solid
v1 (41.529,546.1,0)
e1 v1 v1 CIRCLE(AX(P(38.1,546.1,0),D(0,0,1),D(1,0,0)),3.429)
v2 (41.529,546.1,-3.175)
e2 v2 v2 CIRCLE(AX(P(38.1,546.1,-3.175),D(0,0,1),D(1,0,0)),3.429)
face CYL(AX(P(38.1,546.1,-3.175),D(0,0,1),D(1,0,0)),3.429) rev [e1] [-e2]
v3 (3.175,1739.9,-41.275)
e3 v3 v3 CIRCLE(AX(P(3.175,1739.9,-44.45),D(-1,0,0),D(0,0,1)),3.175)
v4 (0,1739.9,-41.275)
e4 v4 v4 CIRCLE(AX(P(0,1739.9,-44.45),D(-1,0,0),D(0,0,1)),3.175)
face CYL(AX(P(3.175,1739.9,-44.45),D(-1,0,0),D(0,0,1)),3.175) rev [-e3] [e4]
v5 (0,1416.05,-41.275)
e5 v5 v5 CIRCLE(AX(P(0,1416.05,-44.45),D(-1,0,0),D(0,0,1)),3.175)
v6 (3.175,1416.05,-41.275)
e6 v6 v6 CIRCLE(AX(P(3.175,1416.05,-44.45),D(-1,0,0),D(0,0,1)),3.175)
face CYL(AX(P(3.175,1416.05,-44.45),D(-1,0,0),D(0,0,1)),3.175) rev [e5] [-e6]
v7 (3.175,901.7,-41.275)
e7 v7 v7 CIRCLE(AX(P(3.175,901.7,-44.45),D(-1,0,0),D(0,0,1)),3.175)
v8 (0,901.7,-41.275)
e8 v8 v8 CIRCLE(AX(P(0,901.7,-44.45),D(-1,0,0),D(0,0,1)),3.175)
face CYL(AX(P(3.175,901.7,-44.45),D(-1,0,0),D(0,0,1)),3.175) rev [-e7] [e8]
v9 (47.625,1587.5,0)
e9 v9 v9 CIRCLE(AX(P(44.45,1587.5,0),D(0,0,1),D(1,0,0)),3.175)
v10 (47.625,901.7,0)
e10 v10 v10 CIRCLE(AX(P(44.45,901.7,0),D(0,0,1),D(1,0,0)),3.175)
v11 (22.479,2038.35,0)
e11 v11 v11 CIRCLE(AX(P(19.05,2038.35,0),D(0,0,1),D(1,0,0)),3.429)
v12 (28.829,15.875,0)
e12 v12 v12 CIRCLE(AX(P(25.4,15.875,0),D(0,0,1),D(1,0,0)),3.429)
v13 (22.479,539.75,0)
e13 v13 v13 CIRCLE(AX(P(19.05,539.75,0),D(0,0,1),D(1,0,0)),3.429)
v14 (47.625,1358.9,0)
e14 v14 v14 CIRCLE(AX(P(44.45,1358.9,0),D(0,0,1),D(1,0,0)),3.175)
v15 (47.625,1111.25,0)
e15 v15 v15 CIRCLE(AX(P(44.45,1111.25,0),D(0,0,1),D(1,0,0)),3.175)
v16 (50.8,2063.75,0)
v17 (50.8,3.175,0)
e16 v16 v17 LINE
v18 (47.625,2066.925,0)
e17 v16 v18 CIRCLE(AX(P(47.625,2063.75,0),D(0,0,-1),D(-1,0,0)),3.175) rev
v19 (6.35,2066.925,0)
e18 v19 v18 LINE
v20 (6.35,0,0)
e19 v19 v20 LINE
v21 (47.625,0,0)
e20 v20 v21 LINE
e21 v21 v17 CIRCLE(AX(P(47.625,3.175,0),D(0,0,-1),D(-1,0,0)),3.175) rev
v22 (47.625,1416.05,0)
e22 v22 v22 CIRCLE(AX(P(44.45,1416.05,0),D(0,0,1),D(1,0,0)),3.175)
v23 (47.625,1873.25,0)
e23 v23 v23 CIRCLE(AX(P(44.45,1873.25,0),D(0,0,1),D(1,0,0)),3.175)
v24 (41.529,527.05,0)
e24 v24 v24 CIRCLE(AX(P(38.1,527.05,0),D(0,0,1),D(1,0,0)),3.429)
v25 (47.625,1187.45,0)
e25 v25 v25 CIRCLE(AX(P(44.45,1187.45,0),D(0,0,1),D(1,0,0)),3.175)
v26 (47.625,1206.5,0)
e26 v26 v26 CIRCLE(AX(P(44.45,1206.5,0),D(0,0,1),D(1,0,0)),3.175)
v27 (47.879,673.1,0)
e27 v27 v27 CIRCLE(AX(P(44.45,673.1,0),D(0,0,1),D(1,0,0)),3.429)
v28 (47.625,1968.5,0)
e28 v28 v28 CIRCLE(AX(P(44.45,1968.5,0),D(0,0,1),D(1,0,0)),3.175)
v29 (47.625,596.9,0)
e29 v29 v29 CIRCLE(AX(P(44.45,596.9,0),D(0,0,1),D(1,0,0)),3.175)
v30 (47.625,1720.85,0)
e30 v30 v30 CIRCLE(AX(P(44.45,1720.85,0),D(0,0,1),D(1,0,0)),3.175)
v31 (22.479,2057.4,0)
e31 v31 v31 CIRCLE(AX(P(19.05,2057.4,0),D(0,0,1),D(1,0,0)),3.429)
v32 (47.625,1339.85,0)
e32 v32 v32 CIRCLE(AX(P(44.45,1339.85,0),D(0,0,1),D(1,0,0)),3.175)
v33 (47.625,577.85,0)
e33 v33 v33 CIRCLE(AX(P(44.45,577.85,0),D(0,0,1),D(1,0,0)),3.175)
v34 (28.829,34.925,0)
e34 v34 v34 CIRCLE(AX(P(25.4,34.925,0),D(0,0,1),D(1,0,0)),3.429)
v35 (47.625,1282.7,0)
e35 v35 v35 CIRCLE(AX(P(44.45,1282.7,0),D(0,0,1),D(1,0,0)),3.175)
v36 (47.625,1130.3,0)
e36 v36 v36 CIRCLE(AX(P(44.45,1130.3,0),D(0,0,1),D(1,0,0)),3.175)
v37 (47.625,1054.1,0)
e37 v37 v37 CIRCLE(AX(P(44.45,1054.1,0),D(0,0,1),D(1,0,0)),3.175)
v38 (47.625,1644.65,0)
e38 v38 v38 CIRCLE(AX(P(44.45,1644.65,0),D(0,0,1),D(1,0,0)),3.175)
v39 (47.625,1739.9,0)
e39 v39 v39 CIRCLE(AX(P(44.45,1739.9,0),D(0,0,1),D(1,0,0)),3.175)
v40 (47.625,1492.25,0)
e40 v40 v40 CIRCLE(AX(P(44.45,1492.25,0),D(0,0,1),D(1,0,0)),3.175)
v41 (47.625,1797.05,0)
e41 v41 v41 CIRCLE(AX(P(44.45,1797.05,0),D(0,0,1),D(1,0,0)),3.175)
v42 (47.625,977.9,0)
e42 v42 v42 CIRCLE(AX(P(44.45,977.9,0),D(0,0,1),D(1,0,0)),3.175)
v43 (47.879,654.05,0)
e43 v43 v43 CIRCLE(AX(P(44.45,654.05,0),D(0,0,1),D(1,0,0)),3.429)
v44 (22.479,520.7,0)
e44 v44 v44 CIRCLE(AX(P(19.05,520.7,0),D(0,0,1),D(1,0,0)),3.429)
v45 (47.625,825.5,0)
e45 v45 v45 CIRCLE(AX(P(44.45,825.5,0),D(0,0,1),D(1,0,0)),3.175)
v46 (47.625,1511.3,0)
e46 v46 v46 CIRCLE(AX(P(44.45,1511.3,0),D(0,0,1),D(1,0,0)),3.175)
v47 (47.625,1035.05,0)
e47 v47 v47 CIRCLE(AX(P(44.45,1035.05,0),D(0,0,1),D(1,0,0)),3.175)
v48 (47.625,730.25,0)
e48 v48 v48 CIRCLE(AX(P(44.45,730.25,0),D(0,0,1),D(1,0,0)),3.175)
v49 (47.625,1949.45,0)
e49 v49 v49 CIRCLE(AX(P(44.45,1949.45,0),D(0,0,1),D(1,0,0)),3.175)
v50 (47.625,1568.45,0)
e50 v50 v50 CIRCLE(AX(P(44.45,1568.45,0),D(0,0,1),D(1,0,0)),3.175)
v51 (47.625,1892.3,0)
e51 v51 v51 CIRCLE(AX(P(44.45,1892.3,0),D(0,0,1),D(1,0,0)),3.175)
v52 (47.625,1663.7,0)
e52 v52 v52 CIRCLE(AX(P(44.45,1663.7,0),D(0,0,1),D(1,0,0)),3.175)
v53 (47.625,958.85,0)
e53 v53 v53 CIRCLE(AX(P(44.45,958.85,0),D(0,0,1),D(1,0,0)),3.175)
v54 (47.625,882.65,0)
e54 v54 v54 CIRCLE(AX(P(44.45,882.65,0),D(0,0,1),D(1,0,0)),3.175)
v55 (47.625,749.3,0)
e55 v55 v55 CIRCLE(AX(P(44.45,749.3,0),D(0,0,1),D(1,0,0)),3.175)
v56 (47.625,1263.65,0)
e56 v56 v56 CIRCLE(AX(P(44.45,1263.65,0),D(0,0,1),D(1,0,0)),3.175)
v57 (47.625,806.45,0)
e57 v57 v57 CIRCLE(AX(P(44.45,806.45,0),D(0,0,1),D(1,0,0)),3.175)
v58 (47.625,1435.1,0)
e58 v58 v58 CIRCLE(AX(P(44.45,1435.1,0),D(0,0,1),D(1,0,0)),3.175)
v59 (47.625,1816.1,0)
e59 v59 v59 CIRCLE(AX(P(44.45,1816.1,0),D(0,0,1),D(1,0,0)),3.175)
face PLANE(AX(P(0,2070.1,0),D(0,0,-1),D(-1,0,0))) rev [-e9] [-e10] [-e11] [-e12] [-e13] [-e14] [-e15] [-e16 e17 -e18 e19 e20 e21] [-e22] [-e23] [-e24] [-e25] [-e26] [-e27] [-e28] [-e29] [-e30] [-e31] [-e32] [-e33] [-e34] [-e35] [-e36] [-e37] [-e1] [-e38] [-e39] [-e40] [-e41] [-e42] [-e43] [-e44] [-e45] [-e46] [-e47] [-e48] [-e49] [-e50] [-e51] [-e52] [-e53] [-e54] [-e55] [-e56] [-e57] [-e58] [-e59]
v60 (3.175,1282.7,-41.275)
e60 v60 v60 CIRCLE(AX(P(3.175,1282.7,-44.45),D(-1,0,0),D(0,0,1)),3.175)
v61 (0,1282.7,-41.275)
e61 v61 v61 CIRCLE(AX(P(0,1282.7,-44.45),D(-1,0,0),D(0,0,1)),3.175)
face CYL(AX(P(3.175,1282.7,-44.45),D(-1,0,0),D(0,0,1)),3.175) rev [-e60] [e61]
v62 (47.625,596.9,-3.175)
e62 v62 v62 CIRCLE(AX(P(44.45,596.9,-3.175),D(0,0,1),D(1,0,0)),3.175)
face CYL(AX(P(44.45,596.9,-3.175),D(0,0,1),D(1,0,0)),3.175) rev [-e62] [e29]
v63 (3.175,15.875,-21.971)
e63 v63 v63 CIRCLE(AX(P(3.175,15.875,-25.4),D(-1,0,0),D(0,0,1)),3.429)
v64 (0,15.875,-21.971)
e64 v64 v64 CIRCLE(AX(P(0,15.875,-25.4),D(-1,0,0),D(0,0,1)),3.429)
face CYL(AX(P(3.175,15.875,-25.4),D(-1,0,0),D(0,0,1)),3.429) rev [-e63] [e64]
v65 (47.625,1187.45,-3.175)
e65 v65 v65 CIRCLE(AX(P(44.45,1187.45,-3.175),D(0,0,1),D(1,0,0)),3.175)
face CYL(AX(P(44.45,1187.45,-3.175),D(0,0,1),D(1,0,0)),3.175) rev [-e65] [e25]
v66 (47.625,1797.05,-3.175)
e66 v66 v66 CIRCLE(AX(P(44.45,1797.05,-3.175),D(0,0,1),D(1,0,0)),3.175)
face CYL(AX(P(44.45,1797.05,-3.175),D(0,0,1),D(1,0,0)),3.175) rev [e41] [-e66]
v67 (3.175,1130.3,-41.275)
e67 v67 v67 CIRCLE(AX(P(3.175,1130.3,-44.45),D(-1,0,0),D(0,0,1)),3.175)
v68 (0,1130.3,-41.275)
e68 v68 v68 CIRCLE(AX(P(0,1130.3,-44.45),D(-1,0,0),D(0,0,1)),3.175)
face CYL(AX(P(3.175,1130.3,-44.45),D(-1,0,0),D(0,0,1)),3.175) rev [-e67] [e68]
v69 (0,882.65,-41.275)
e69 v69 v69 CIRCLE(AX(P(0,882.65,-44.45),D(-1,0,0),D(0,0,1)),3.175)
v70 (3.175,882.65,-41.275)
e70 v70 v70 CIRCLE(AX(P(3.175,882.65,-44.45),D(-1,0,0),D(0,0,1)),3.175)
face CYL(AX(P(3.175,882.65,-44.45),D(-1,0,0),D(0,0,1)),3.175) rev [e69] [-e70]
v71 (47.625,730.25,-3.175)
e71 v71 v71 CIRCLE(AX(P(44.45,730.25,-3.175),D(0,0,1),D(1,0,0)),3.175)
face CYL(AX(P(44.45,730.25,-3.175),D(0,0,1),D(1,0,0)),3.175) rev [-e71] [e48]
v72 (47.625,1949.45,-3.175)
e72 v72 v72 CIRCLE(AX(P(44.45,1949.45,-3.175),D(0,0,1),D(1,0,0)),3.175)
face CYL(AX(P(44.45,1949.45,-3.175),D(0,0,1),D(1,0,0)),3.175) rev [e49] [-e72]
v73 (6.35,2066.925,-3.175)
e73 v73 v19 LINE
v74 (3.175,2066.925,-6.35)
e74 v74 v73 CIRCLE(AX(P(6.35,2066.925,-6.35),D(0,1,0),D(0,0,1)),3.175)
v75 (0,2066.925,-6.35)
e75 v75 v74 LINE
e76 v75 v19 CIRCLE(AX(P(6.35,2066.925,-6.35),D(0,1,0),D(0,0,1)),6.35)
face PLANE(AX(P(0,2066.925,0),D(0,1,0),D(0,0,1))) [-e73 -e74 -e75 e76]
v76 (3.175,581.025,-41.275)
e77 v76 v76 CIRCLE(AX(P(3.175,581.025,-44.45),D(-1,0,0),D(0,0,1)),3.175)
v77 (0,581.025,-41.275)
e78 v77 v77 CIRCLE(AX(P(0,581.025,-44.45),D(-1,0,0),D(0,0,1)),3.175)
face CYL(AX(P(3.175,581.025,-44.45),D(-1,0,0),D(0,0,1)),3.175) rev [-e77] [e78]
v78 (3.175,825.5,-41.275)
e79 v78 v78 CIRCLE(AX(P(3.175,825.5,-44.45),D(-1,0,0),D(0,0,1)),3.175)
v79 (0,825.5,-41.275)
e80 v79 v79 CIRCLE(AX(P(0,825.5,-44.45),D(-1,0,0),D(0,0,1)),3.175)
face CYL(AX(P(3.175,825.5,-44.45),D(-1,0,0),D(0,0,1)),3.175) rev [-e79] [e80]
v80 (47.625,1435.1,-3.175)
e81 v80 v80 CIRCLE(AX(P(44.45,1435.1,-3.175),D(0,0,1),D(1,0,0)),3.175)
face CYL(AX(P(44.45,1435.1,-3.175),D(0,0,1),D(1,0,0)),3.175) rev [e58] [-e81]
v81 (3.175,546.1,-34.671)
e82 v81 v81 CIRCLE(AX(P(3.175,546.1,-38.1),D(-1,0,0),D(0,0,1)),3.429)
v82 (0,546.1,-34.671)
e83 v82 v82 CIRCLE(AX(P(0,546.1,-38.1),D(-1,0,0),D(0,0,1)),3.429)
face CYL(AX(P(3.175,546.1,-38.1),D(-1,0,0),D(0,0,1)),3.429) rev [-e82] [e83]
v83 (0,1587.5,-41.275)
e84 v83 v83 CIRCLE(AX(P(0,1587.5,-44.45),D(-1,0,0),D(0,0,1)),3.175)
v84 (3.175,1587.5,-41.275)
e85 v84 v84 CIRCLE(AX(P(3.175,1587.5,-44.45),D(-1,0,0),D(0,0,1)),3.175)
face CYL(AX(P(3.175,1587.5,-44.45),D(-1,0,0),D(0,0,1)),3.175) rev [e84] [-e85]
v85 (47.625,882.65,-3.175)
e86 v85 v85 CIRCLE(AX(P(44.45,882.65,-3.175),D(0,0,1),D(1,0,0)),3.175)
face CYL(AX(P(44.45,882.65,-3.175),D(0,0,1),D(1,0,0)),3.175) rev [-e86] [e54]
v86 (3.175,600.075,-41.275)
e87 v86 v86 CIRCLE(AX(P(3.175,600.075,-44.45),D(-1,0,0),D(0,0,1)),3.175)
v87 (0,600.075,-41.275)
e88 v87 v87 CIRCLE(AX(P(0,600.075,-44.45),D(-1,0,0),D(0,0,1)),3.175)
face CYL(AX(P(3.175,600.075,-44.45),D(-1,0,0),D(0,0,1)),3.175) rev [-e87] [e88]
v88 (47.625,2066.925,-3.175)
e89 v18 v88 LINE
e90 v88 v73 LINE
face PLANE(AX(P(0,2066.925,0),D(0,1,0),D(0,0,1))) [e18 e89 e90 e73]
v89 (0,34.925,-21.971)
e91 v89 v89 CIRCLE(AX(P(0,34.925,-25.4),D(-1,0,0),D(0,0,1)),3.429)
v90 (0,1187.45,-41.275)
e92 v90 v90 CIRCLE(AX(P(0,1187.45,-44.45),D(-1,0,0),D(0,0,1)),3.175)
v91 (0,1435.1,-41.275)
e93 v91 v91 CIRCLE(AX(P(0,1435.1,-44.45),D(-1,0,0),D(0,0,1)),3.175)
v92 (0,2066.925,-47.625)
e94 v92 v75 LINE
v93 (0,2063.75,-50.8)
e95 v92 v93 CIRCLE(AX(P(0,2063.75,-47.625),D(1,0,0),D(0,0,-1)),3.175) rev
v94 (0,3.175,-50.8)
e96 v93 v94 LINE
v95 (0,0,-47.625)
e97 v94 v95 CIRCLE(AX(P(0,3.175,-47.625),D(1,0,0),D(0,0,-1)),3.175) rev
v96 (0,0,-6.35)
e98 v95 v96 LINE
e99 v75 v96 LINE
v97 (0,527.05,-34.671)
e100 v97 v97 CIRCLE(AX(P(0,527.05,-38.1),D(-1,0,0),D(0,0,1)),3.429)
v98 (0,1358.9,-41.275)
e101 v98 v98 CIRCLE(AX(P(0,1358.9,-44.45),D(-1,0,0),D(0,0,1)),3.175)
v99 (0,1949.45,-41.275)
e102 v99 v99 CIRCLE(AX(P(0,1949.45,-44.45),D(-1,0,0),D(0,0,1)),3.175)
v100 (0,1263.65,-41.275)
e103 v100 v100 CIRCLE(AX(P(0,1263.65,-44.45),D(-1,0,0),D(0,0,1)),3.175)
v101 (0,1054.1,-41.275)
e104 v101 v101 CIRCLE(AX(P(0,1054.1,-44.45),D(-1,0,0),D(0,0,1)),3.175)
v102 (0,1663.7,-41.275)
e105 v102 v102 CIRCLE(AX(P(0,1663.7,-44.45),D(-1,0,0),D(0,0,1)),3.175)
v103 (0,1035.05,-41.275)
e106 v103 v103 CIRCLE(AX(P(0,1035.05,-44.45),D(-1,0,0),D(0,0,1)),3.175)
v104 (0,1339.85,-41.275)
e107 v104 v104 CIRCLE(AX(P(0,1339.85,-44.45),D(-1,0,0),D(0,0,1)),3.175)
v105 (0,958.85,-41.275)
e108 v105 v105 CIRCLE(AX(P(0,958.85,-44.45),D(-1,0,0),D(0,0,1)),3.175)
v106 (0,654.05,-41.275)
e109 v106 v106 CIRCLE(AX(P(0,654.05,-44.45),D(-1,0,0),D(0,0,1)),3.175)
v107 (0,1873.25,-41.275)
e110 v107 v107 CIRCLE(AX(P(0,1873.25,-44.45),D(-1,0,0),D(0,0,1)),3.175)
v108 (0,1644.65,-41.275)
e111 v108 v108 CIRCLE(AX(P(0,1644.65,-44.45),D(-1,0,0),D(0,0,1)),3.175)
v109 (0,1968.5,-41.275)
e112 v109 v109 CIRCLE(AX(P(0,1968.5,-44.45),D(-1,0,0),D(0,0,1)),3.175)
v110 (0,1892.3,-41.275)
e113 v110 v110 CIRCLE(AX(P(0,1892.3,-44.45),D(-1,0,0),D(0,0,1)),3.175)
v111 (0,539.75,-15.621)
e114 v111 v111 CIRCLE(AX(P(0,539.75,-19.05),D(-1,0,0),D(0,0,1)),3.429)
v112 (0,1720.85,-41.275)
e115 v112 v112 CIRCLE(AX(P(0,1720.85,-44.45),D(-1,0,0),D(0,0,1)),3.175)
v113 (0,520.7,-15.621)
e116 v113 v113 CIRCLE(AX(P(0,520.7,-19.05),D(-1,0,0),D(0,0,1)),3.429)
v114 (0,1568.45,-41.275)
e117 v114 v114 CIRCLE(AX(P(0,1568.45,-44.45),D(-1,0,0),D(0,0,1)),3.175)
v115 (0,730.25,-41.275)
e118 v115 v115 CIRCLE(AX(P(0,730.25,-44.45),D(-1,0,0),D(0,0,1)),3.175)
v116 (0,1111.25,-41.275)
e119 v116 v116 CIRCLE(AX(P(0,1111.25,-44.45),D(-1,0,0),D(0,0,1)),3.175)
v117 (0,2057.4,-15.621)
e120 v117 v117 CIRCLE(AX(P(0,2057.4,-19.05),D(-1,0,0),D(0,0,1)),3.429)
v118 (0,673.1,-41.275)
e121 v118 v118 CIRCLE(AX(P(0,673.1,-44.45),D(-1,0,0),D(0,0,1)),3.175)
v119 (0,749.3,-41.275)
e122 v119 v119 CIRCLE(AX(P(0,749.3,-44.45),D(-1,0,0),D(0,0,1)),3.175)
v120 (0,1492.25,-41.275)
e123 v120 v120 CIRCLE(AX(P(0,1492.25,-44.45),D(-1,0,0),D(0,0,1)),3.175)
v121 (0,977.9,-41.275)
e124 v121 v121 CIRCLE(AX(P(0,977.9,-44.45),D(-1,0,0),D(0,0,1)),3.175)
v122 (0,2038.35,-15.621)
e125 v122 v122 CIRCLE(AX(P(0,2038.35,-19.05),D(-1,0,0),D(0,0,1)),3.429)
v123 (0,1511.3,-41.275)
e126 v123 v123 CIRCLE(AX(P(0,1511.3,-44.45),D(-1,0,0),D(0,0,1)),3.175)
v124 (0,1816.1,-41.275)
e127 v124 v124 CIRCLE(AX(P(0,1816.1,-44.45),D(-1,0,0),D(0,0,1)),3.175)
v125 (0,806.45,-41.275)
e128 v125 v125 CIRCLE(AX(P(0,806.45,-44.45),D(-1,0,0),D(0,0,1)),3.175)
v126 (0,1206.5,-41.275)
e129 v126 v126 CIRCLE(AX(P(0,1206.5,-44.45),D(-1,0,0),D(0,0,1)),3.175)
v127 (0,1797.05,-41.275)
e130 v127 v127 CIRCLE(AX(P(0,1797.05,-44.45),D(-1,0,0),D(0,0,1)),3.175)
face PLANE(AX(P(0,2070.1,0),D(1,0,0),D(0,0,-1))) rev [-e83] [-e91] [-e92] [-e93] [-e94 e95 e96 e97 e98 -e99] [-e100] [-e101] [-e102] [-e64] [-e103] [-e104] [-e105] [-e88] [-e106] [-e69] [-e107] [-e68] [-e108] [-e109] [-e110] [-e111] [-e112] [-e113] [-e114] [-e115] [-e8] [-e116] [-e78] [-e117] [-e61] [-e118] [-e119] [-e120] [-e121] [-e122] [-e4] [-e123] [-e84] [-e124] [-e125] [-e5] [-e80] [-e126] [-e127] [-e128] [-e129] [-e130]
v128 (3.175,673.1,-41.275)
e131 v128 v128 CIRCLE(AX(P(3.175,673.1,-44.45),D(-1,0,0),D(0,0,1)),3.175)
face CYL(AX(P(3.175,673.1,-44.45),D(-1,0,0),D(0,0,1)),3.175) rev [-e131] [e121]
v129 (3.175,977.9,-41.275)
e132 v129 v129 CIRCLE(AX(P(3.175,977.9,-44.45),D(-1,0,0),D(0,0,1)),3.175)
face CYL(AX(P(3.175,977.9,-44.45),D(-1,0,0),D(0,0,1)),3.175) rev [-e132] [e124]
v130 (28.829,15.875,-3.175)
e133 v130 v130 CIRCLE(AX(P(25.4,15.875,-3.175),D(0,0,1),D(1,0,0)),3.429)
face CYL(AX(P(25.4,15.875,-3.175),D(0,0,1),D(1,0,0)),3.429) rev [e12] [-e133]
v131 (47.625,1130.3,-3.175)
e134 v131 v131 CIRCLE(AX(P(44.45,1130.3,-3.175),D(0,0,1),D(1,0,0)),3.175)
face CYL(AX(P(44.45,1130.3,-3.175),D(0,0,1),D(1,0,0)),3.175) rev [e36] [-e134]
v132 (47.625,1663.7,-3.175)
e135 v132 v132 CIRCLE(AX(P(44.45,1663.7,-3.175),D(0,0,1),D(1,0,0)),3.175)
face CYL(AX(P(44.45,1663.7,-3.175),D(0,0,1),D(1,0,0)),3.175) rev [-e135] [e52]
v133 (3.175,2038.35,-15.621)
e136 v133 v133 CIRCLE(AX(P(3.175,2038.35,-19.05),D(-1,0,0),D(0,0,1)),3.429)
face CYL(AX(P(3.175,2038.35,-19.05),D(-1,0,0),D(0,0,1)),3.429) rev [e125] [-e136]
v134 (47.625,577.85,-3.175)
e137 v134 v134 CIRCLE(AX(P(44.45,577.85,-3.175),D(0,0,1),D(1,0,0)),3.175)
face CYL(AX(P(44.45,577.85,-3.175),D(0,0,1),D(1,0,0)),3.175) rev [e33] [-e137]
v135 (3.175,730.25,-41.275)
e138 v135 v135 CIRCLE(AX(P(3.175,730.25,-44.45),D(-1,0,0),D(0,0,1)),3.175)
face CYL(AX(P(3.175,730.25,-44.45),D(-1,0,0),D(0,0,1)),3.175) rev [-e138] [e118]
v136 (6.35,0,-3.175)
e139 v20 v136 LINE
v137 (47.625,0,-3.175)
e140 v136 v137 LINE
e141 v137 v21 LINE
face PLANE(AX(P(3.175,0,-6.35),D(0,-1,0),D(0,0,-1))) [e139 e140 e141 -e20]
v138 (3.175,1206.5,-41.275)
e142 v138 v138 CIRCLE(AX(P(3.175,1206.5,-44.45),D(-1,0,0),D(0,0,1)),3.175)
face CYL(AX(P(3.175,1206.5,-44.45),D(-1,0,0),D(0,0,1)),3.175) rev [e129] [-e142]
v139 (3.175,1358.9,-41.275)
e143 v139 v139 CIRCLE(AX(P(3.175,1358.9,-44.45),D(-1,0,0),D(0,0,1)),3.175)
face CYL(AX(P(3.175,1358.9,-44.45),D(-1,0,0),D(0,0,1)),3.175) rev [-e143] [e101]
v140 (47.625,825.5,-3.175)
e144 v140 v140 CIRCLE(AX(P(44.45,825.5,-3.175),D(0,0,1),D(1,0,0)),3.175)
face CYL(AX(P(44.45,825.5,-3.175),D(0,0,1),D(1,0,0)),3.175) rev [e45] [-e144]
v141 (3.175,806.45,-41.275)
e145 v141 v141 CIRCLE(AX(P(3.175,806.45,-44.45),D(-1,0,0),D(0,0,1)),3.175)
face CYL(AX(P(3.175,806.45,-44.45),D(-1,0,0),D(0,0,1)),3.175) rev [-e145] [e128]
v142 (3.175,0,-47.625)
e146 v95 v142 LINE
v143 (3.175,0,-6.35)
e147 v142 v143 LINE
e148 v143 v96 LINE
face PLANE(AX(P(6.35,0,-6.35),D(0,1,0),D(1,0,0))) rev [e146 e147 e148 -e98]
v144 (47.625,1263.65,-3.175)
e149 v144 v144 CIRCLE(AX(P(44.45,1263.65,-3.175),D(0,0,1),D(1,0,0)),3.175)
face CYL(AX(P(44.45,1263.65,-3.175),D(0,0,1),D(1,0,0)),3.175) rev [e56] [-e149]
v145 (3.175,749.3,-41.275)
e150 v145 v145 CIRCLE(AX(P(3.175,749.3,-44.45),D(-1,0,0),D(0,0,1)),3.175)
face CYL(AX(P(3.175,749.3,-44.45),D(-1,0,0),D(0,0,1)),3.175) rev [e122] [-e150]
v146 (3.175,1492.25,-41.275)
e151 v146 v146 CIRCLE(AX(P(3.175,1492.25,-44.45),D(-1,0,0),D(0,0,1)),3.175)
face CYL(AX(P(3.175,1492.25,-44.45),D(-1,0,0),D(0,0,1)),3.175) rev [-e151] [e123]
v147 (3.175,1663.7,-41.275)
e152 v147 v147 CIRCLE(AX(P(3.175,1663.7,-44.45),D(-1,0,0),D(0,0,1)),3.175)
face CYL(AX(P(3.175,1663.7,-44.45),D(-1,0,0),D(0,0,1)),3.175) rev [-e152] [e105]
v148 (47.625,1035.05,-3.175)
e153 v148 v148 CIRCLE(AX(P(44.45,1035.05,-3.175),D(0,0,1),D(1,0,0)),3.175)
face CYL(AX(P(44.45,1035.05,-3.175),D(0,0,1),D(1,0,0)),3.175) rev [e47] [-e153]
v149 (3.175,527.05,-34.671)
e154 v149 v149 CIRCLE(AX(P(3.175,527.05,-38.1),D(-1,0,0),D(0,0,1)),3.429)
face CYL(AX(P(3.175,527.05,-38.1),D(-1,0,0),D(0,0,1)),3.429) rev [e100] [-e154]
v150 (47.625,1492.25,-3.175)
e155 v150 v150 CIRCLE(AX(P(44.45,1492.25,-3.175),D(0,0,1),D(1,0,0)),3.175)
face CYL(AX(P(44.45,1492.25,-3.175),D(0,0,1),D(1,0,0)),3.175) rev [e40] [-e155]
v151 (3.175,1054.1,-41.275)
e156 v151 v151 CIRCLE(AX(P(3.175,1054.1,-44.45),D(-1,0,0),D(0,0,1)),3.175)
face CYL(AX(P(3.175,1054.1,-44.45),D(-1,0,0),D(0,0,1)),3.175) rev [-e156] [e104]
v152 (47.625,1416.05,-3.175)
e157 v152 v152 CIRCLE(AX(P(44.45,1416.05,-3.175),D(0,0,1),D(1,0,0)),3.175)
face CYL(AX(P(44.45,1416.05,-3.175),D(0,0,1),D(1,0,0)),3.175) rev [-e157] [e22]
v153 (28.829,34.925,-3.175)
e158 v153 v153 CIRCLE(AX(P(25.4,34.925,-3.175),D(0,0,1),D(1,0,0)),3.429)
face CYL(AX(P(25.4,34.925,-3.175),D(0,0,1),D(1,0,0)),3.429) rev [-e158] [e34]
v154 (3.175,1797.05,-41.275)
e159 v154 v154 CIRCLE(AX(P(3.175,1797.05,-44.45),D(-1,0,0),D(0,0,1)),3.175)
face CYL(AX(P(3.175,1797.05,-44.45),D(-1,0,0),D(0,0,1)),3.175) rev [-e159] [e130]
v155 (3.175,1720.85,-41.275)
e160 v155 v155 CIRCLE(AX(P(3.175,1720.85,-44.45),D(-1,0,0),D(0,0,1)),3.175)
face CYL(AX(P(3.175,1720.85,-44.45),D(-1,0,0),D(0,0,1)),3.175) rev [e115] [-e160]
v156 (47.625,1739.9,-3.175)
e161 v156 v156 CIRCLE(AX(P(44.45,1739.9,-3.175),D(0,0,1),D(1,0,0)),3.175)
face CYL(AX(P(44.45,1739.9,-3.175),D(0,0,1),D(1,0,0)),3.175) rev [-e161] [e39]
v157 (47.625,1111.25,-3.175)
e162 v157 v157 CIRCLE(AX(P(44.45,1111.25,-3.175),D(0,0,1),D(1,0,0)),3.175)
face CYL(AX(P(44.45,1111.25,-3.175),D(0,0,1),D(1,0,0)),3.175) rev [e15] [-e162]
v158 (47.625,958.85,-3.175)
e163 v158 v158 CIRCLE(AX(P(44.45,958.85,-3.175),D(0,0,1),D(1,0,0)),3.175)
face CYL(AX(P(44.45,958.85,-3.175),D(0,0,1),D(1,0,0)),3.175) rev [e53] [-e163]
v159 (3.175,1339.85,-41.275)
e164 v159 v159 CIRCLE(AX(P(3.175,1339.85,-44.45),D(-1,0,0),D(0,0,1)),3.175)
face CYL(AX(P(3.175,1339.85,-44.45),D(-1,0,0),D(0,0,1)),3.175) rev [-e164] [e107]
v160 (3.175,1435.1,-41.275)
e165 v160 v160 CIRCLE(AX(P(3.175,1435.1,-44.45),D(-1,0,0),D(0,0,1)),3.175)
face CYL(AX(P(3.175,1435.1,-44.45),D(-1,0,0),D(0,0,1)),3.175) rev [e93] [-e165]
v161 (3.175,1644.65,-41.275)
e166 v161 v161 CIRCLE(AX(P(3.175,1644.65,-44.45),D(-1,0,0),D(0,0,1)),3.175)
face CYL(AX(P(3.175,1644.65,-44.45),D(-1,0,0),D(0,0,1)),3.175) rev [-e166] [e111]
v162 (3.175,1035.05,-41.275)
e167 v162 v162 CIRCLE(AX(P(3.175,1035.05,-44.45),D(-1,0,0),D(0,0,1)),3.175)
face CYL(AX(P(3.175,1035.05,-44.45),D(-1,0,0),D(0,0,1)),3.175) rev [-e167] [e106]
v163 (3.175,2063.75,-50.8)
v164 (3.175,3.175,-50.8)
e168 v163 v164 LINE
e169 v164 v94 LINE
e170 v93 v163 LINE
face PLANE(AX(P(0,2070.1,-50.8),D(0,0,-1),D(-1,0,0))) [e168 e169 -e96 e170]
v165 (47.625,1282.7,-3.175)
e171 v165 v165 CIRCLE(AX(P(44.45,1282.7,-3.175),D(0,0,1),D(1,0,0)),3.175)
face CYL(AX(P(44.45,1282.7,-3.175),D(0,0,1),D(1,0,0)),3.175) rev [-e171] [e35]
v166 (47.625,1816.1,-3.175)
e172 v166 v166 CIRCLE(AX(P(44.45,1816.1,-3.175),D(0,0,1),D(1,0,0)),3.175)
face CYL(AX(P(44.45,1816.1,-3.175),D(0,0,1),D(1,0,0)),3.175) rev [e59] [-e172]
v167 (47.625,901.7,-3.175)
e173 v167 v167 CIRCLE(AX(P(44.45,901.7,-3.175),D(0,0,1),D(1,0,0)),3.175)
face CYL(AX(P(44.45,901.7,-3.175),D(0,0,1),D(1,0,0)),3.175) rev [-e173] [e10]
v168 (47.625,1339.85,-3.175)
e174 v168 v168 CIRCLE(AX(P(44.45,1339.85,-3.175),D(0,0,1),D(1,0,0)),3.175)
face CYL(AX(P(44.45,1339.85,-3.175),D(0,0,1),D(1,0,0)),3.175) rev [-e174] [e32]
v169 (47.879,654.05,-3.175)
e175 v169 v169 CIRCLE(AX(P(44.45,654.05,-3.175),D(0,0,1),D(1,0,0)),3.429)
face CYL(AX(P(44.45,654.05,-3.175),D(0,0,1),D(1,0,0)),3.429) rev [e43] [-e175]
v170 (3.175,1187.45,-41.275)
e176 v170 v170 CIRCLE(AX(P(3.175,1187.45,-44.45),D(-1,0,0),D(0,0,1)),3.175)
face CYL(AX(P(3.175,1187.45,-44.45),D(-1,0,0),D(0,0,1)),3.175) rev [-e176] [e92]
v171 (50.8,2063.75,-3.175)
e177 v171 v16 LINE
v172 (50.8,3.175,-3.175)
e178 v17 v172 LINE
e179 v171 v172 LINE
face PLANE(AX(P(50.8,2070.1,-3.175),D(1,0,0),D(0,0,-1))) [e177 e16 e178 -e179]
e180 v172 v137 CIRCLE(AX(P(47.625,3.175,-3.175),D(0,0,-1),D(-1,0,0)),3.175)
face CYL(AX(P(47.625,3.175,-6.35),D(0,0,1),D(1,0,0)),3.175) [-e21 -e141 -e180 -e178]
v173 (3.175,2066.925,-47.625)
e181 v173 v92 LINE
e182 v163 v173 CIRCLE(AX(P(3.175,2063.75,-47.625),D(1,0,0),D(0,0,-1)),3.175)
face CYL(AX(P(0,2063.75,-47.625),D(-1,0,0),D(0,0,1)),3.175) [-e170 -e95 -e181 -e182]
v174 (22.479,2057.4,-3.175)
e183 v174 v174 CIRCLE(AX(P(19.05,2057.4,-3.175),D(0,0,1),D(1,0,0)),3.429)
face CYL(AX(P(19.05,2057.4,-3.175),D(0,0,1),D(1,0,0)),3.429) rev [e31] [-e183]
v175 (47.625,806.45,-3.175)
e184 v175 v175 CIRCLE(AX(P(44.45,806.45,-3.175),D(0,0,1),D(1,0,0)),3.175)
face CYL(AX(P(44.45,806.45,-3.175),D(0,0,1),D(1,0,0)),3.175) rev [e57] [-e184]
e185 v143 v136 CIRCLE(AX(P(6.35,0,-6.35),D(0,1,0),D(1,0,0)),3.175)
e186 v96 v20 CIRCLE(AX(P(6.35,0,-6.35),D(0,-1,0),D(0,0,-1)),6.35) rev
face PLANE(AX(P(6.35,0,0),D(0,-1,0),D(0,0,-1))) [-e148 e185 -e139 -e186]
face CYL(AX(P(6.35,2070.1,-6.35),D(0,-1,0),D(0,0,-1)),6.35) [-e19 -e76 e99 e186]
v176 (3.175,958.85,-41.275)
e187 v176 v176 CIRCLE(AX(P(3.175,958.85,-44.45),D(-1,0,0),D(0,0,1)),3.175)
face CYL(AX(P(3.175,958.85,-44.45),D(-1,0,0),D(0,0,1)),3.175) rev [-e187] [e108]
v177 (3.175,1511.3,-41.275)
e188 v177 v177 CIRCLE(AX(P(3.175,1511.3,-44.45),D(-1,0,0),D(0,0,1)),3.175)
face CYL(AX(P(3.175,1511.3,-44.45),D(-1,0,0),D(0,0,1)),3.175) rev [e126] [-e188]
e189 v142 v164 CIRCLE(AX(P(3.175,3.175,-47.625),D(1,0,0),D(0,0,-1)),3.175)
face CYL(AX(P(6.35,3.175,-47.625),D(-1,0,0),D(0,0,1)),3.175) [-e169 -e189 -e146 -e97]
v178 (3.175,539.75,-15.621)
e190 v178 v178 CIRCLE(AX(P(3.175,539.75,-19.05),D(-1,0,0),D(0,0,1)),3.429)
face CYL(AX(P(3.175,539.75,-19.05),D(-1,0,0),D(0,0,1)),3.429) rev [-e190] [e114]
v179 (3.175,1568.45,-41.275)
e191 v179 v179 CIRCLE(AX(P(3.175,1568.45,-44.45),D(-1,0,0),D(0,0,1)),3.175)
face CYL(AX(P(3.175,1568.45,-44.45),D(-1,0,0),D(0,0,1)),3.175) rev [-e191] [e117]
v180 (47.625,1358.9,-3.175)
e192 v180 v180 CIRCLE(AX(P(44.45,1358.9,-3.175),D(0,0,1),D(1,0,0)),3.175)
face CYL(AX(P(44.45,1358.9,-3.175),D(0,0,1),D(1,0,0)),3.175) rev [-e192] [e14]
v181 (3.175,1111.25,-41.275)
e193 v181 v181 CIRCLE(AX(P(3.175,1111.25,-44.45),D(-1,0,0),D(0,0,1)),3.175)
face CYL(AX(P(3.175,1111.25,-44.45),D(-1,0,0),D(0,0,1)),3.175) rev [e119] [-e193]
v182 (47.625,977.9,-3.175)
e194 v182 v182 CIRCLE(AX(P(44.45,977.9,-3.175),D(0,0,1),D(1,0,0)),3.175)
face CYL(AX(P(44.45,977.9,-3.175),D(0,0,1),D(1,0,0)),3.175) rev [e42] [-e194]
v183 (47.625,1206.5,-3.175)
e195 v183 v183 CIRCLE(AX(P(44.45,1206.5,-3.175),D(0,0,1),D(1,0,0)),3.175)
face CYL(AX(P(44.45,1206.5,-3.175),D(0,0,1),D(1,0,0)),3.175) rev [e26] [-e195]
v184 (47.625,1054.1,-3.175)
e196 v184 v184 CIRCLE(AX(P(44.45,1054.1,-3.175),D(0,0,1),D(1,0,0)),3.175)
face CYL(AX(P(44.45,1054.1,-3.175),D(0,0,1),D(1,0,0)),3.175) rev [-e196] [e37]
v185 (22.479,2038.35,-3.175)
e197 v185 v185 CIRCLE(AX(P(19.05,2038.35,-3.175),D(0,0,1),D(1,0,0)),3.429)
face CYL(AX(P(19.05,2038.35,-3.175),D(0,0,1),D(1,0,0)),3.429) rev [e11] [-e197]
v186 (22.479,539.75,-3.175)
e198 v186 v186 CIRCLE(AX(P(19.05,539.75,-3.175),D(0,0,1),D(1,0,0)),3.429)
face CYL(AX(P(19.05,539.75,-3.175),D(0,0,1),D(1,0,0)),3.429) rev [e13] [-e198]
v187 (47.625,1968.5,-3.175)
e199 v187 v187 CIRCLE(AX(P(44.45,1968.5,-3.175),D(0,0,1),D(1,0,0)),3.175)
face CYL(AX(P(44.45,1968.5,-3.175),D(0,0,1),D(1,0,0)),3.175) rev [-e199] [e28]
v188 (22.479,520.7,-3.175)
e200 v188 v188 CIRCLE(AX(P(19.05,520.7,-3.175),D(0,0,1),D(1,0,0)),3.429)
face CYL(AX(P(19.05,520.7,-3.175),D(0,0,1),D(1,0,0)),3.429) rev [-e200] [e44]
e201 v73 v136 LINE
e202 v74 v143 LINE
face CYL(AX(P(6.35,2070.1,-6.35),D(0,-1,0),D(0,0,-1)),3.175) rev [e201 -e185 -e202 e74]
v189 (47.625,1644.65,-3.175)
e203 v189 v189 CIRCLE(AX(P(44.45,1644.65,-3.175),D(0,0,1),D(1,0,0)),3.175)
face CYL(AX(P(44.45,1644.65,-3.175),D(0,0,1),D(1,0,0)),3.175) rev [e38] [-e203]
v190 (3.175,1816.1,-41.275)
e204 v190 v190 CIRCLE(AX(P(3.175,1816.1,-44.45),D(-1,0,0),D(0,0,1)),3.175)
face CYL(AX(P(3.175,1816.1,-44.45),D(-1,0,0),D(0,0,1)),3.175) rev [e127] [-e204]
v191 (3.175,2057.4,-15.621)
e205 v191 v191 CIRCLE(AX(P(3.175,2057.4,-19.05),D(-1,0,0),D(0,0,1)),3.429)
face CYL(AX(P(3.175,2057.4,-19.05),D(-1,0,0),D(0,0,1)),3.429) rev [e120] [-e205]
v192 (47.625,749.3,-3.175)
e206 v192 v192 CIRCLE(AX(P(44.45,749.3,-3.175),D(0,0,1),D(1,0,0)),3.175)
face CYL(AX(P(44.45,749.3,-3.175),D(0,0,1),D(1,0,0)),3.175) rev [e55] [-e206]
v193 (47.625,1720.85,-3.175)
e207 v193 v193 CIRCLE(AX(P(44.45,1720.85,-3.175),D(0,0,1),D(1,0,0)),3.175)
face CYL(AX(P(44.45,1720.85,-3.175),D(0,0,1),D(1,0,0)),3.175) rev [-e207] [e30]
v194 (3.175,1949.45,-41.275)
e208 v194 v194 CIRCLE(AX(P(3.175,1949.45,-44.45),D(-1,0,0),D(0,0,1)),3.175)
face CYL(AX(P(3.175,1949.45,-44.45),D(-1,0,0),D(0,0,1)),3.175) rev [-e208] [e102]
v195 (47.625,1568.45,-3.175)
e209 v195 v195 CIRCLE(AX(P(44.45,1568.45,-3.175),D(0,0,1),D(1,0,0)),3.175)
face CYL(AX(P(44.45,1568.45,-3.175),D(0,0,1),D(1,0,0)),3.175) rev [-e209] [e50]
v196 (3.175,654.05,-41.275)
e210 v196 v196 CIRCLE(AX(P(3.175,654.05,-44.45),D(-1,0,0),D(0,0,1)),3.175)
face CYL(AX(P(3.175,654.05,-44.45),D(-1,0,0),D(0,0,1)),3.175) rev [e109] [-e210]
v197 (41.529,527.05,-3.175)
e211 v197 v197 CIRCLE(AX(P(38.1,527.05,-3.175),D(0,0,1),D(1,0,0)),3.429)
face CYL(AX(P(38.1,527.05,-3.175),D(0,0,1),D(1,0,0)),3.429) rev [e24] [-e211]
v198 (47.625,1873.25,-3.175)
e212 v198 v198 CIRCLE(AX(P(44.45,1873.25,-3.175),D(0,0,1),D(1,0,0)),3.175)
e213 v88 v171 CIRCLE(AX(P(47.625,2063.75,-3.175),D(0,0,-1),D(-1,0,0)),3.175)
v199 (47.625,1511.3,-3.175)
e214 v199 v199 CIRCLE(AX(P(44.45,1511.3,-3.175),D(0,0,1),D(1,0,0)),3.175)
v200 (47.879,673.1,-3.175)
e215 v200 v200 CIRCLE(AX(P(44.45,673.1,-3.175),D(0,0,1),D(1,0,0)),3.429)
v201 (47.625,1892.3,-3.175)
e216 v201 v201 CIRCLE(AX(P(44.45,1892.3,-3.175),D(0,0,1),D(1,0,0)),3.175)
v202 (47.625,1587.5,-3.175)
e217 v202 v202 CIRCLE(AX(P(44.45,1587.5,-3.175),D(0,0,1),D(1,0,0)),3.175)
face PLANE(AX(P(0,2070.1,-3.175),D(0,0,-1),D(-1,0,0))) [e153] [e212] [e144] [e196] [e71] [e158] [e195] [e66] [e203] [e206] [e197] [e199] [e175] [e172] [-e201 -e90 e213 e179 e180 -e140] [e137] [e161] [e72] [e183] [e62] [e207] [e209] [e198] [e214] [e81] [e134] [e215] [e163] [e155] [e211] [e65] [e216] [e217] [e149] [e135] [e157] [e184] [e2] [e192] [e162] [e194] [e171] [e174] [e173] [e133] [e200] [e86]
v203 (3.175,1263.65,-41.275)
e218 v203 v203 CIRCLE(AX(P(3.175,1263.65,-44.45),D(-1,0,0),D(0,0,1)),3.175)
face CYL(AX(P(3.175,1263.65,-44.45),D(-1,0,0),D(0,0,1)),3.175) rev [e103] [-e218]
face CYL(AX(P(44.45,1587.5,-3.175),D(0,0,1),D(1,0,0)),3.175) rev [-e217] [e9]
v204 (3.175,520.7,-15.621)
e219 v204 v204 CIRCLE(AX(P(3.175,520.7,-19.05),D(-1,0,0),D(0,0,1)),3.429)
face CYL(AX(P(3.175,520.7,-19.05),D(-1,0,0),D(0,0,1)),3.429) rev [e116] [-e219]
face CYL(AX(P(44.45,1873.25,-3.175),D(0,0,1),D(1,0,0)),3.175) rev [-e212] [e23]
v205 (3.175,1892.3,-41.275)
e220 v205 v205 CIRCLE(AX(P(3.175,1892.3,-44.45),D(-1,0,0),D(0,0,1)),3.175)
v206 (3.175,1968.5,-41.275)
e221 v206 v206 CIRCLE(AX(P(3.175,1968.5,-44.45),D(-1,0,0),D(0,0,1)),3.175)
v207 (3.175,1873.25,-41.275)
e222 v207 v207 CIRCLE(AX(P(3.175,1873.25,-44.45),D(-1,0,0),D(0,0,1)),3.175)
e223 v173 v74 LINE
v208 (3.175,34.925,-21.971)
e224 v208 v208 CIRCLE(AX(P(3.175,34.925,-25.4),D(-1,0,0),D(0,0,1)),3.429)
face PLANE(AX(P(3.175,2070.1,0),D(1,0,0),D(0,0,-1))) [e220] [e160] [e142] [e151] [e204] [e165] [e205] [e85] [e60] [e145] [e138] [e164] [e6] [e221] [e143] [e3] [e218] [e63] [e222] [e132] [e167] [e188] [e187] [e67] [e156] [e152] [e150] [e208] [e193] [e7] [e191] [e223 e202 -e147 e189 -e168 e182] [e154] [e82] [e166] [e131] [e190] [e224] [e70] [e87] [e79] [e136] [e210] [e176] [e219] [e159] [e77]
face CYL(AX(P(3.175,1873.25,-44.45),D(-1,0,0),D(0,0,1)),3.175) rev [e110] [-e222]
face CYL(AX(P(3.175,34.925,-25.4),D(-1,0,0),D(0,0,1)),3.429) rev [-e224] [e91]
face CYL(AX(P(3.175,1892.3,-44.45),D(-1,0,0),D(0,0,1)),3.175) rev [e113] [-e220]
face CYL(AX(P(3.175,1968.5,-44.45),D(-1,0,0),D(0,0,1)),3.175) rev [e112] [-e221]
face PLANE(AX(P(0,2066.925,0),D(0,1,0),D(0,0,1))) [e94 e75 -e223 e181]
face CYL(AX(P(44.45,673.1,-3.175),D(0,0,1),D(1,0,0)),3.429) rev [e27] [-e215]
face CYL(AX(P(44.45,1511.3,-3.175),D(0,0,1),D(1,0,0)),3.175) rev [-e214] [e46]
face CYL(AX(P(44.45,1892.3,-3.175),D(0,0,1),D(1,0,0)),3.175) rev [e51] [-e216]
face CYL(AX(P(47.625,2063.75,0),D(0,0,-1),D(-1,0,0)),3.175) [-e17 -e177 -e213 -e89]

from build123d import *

# Parameters (mm, degrees)
BASE_FLANGE1_DEPTH = 2070.1
CUT_EXTRUDE1_DEPTH = 3.175
SKETCH3_R          = 3.429
SKETCH3_R_2        = 3.175
CUT_EXTRUDE2_DEPTH = 3.175
SKETCH4_R          = 3.429
SKETCH4_R_2        = 3.175
CUT_EXTRUDE3_DEPTH = 3.175
FILLET1_R          = 3.175


# Sheet-metal steps are written as plain solids
with BuildPart() as part:
    # Sketch1 → Base-Flange1 (new body)
    with BuildSketch(Plane(origin=(0, 0, 0), x_dir=(1, 0, 0), z_dir=(0, 1, 0))):
        with BuildLine():
            Line((50.8, 0), (6.35, 0))
            ThreePointArc((6.35, 0), (1.859871939, 1.859871939), (0, 6.35))
            Line((0, 6.35), (0, 50.8))
            Line((0, 50.8), (3.175, 50.8))
            Line((3.175, 50.8), (3.175, 6.35))
            ThreePointArc((3.175, 6.35), (4.10493597, 4.10493597), (6.35, 3.175))
            Line((6.35, 3.175), (50.8, 3.175))
            Line((50.8, 3.175), (50.8, 0))
        make_face()
    extrude(amount=BASE_FLANGE1_DEPTH)

    # Sketch2 → Cut-Extrude1 (cut)
    with BuildSketch(Plane(origin=(0, 2070.1, 0), x_dir=(1, 0, 0), z_dir=(0, 1, 0))):
        Polygon((6.35, 0), (0, 0), (0, 50.8), (6.35, 50.8), (6.35, 3.175), (50.8, 3.175), (50.8, 0), align=None)
    extrude(amount=-CUT_EXTRUDE1_DEPTH, mode=Mode.SUBTRACT)

    # Sketch3 → Cut-Extrude2 (cut)
    with BuildSketch(Plane.XY):
        with Locations((19.05, 2057.4)):
            Circle(SKETCH3_R)
        with Locations((19.05, 2038.35)):
            Circle(SKETCH3_R)
        with Locations((44.45, 1968.5)):
            Circle(SKETCH3_R_2)
        with Locations((44.45, 1949.45)):
            Circle(SKETCH3_R_2)
        with Locations((44.45, 1892.3)):
            Circle(SKETCH3_R_2)
        with Locations((44.45, 1873.25)):
            Circle(SKETCH3_R_2)
        with Locations((44.45, 1816.1)):
            Circle(SKETCH3_R_2)
        with Locations((44.45, 1797.05)):
            Circle(SKETCH3_R_2)
        with Locations((44.45, 1739.9)):
            Circle(SKETCH3_R_2)
        with Locations((44.45, 1720.85)):
            Circle(SKETCH3_R_2)
        with Locations((44.45, 1663.7)):
            Circle(SKETCH3_R_2)
        with Locations((44.45, 1644.65)):
            Circle(SKETCH3_R_2)
        with Locations((44.45, 1587.5)):
            Circle(SKETCH3_R_2)
        with Locations((44.45, 1568.45)):
            Circle(SKETCH3_R_2)
        with Locations((44.45, 1511.3)):
            Circle(SKETCH3_R_2)
        with Locations((44.45, 1492.25)):
            Circle(SKETCH3_R_2)
        with Locations((44.45, 1435.1)):
            Circle(SKETCH3_R_2)
        with Locations((44.45, 1416.05)):
            Circle(SKETCH3_R_2)
        with Locations((44.45, 1358.9)):
            Circle(SKETCH3_R_2)
        with Locations((44.45, 1339.85)):
            Circle(SKETCH3_R_2)
        with Locations((44.45, 1282.7)):
            Circle(SKETCH3_R_2)
        with Locations((44.45, 1263.65)):
            Circle(SKETCH3_R_2)
        with Locations((44.45, 1206.5)):
            Circle(SKETCH3_R_2)
        with Locations((44.45, 1187.45)):
            Circle(SKETCH3_R_2)
        with Locations((44.45, 1130.3)):
            Circle(SKETCH3_R_2)
        with Locations((44.45, 1111.25)):
            Circle(SKETCH3_R_2)
        with Locations((44.45, 1054.1)):
            Circle(SKETCH3_R_2)
        with Locations((44.45, 1035.05)):
            Circle(SKETCH3_R_2)
        with Locations((44.45, 977.9)):
            Circle(SKETCH3_R_2)
        with Locations((44.45, 958.85)):
            Circle(SKETCH3_R_2)
        with Locations((44.45, 901.7)):
            Circle(SKETCH3_R_2)
        with Locations((44.45, 882.65)):
            Circle(SKETCH3_R_2)
        with Locations((44.45, 825.5)):
            Circle(SKETCH3_R_2)
        with Locations((44.45, 806.45)):
            Circle(SKETCH3_R_2)
        with Locations((44.45, 749.3)):
            Circle(SKETCH3_R_2)
        with Locations((44.45, 730.25)):
            Circle(SKETCH3_R_2)
        with Locations((44.45, 596.9)):
            Circle(SKETCH3_R_2)
        with Locations((44.45, 577.85)):
            Circle(SKETCH3_R_2)
        with Locations((38.1, 546.1)):
            Circle(SKETCH3_R)
        with Locations((44.45, 673.1)):
            Circle(SKETCH3_R)
        with Locations((44.45, 654.05)):
            Circle(SKETCH3_R)
        with Locations((19.05, 539.75)):
            Circle(SKETCH3_R)
        with Locations((19.05, 520.7)):
            Circle(SKETCH3_R)
        with Locations((25.4, 15.875)):
            Circle(SKETCH3_R)
        with Locations((25.4, 34.925)):
            Circle(SKETCH3_R)
        with Locations((38.1, 527.05)):
            Circle(SKETCH3_R)
    extrude(amount=-CUT_EXTRUDE2_DEPTH, mode=Mode.SUBTRACT)

    # Sketch4 → Cut-Extrude3 (cut)
    with BuildSketch(Plane.ZY):
        with Locations((-19.05, 2057.4)):
            Circle(SKETCH4_R)
        with Locations((-19.05, 2038.35)):
            Circle(SKETCH4_R)
        with Locations((-44.45, 1968.5)):
            Circle(SKETCH4_R_2)
        with Locations((-44.45, 1949.45)):
            Circle(SKETCH4_R_2)
        with Locations((-44.45, 600.075)):
            Circle(SKETCH4_R_2)
        with Locations((-44.45, 581.025)):
            Circle(SKETCH4_R_2)
        with Locations((-38.1, 546.1)):
            Circle(SKETCH4_R)
        with Locations((-19.05, 539.75)):
            Circle(SKETCH4_R)
        with Locations((-44.45, 1873.25)):
            Circle(SKETCH4_R_2)
        with Locations((-44.45, 1892.3)):
            Circle(SKETCH4_R_2)
        with Locations((-44.45, 1797.05)):
            Circle(SKETCH4_R_2)
        with Locations((-44.45, 1816.1)):
            Circle(SKETCH4_R_2)
        with Locations((-44.45, 1720.85)):
            Circle(SKETCH4_R_2)
        with Locations((-44.45, 1739.9)):
            Circle(SKETCH4_R_2)
        with Locations((-44.45, 1644.65)):
            Circle(SKETCH4_R_2)
        with Locations((-44.45, 1663.7)):
            Circle(SKETCH4_R_2)
        with Locations((-44.45, 1568.45)):
            Circle(SKETCH4_R_2)
        with Locations((-44.45, 1587.5)):
            Circle(SKETCH4_R_2)
        with Locations((-44.45, 1492.25)):
            Circle(SKETCH4_R_2)
        with Locations((-44.45, 1511.3)):
            Circle(SKETCH4_R_2)
        with Locations((-44.45, 1416.05)):
            Circle(SKETCH4_R_2)
        with Locations((-44.45, 1435.1)):
            Circle(SKETCH4_R_2)
        with Locations((-44.45, 1339.85)):
            Circle(SKETCH4_R_2)
        with Locations((-44.45, 1358.9)):
            Circle(SKETCH4_R_2)
        with Locations((-44.45, 1263.65)):
            Circle(SKETCH4_R_2)
        with Locations((-44.45, 1282.7)):
            Circle(SKETCH4_R_2)
        with Locations((-44.45, 1187.45)):
            Circle(SKETCH4_R_2)
        with Locations((-44.45, 1206.5)):
            Circle(SKETCH4_R_2)
        with Locations((-44.45, 1111.25)):
            Circle(SKETCH4_R_2)
        with Locations((-44.45, 1130.3)):
            Circle(SKETCH4_R_2)
        with Locations((-44.45, 1035.05)):
            Circle(SKETCH4_R_2)
        with Locations((-44.45, 1054.1)):
            Circle(SKETCH4_R_2)
        with Locations((-44.45, 958.85)):
            Circle(SKETCH4_R_2)
        with Locations((-44.45, 977.9)):
            Circle(SKETCH4_R_2)
        with Locations((-44.45, 882.65)):
            Circle(SKETCH4_R_2)
        with Locations((-44.45, 901.7)):
            Circle(SKETCH4_R_2)
        with Locations((-44.45, 806.45)):
            Circle(SKETCH4_R_2)
        with Locations((-44.45, 825.5)):
            Circle(SKETCH4_R_2)
        with Locations((-44.45, 730.25)):
            Circle(SKETCH4_R_2)
        with Locations((-44.45, 749.3)):
            Circle(SKETCH4_R_2)
        with Locations((-44.45, 654.05)):
            Circle(SKETCH4_R_2)
        with Locations((-44.45, 673.1)):
            Circle(SKETCH4_R_2)
        with Locations((-19.05, 520.7)):
            Circle(SKETCH4_R)
        with Locations((-25.4, 34.925)):
            Circle(SKETCH4_R)
        with Locations((-25.4, 15.875)):
            Circle(SKETCH4_R)
        with Locations((-38.1, 527.05)):
            Circle(SKETCH4_R)
    extrude(amount=-CUT_EXTRUDE3_DEPTH, mode=Mode.SUBTRACT)

    # Fillet1
    fillet1_edges = [part.edges().sort_by_distance(p)[0] for p in [
        (1.5875, 2066.925, -50.8),
        (50.8, 2066.925, -1.5875),
        (1.5875, 0, -50.8),
        (50.8, 0, -1.5875),
    ]]
    fillet(fillet1_edges, radius=FILLET1_R)


solid = part.part
